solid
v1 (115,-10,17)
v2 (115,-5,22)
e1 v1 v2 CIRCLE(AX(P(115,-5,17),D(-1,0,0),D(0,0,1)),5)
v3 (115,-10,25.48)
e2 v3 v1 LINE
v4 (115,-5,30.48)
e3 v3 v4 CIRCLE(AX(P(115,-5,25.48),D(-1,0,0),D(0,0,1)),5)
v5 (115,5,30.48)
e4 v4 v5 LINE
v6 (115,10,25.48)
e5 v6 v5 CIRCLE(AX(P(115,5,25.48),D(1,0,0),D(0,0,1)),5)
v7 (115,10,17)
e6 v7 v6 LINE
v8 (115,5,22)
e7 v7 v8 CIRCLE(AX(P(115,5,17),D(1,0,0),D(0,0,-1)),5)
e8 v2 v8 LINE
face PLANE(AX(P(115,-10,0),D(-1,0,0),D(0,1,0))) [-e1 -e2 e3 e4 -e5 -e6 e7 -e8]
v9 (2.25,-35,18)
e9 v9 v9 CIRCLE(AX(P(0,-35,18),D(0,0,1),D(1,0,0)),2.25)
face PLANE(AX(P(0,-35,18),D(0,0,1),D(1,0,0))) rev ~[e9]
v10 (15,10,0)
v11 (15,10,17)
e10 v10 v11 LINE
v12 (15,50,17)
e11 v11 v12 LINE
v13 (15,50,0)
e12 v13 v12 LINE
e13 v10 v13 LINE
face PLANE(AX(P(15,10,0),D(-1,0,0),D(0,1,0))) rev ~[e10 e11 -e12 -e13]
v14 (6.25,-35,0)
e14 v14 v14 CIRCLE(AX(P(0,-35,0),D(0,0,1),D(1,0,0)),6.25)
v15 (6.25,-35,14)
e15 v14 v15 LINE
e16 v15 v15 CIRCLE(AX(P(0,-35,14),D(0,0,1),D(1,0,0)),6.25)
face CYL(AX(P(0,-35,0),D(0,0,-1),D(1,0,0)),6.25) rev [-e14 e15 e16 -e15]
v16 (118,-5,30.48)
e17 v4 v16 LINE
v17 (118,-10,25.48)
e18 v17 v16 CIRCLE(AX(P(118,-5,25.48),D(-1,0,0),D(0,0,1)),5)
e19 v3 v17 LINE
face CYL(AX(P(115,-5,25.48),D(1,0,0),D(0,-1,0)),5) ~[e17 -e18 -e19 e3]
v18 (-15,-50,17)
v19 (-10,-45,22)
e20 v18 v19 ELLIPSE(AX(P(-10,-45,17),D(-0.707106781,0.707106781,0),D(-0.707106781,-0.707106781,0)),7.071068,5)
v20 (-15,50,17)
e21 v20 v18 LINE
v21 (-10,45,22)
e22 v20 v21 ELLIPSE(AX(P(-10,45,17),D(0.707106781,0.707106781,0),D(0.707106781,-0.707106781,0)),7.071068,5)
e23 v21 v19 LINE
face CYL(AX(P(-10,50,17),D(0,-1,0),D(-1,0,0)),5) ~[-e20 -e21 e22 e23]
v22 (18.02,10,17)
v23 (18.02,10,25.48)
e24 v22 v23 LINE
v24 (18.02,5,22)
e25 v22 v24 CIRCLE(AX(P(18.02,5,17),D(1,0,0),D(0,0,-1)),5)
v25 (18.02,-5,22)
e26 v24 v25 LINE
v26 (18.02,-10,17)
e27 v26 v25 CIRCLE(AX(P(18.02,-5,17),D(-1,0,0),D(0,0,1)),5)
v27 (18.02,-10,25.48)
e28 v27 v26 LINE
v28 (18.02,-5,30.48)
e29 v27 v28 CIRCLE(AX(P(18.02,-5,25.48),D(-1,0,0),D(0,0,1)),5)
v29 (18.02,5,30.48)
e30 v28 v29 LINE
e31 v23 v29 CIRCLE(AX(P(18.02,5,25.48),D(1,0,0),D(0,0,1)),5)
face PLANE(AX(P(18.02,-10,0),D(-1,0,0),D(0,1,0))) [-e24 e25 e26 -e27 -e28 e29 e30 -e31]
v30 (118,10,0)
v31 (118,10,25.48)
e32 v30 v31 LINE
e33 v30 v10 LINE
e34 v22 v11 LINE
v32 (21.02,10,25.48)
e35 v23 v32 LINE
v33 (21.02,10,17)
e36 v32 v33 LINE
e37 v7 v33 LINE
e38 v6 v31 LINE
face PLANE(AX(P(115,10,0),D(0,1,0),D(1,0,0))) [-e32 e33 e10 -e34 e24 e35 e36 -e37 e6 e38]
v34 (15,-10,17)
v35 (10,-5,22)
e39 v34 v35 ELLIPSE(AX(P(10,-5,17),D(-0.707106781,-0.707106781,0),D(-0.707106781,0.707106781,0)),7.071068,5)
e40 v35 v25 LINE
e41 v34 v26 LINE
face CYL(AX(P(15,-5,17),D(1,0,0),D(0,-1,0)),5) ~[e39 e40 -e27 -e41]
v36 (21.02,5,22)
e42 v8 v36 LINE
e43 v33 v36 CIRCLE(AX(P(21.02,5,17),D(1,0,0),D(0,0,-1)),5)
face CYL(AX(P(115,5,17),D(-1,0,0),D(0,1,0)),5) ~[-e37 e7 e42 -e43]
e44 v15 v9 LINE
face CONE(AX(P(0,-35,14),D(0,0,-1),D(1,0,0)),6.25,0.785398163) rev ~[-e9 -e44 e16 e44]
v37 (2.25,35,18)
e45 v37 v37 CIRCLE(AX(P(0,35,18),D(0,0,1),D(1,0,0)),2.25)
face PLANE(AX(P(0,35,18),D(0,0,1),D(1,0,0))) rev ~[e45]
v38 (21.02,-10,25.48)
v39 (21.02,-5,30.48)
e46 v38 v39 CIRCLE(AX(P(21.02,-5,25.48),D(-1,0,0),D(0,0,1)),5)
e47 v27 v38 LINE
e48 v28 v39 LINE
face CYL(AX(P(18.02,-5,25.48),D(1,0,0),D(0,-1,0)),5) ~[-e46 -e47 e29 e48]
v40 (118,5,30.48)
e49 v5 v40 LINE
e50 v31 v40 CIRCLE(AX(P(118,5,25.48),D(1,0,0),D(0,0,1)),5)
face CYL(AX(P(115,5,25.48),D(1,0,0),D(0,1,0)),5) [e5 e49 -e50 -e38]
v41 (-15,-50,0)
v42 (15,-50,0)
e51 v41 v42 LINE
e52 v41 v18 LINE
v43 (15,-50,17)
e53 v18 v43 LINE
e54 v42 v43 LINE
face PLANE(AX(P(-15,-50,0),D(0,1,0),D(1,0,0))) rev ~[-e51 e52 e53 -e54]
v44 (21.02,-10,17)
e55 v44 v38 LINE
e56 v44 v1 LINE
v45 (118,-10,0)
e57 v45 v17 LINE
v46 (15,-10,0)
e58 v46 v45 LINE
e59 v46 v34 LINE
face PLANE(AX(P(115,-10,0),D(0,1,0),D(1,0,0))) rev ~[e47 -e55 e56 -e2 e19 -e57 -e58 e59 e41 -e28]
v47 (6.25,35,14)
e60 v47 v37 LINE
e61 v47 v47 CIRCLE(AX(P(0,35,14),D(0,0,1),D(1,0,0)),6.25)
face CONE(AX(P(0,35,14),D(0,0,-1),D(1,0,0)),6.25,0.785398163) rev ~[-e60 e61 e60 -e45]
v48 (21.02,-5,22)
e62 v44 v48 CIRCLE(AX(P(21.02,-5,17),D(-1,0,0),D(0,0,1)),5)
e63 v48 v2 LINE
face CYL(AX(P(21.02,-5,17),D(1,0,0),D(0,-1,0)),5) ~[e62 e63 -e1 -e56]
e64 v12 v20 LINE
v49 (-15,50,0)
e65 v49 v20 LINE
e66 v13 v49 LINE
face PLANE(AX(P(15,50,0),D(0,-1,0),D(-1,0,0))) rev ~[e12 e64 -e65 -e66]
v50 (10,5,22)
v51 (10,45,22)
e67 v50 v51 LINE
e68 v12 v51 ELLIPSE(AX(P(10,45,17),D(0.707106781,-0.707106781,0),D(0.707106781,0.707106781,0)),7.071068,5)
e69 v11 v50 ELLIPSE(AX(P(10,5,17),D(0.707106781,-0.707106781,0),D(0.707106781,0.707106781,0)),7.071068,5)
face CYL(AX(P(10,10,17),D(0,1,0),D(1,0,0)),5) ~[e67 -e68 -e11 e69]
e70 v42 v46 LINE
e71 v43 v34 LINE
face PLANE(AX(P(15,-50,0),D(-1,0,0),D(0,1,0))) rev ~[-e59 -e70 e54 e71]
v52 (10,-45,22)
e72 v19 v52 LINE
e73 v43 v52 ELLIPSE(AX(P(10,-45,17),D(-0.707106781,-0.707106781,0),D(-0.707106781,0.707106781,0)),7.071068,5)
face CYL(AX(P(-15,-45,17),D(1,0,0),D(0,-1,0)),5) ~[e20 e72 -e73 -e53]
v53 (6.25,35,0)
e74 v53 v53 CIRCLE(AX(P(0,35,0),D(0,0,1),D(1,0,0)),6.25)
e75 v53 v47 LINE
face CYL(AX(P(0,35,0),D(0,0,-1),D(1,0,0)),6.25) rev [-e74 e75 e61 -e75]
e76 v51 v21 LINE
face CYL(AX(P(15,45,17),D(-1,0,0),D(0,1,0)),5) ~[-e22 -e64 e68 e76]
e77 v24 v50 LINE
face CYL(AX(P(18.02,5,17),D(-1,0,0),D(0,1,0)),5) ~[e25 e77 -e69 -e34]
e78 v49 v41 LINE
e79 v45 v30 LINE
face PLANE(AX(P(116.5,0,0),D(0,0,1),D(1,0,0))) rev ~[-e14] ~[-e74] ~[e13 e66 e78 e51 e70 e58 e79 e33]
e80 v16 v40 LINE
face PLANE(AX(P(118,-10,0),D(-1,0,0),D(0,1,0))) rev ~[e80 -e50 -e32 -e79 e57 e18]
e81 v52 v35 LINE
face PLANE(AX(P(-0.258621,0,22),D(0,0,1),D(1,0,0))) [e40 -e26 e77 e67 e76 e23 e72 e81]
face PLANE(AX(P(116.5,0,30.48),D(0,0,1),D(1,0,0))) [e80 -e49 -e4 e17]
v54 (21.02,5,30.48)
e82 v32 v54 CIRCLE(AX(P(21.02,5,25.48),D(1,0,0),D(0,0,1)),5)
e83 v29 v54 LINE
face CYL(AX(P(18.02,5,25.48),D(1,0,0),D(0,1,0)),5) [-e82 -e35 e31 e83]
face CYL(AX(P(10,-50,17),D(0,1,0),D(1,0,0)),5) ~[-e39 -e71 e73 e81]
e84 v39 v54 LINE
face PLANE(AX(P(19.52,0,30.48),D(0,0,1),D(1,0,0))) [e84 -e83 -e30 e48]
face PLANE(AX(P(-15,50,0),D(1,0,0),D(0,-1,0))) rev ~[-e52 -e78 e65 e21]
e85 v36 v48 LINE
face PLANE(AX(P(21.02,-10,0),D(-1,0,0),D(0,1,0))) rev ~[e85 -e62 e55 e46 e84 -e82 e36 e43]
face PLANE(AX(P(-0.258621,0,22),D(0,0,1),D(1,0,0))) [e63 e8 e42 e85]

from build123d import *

# Parameters (mm, degrees)
F0_R     = 6.25
F0_W     = 15
F0_H     = 20
F0_W_2   = 93.98
F0_W_3   = 3.02
F0_W_4   = 3
F1_DEPTH = 22
F2_DEPTH = 30.48
F3_DEPTH = 18
F4_SIZE  = 4
F5_R     = 5


with BuildPart() as f1:
    # F0 (on Top) → F1 (new body)
    with BuildSketch(Plane.XY):
        Polygon((15, 10), (15, 50), (-15, 50), (-15, -50), (15, -50), (15, -10), (0, -10), (0, 10), align=None)
        with Locations((0, -35)):
            Circle(F0_R, mode=Mode.SUBTRACT)
        with Locations((0, 35)):
            Circle(F0_R, mode=Mode.SUBTRACT)
        with Locations((7.5, 0)):
            Rectangle(F0_W, F0_H)
        with Locations((68.01, 0)):
            Rectangle(F0_W_2, F0_H)
        with Locations((0, -35)):
            Circle(F0_R)
        with Locations((0, 35)):
            Circle(F0_R)
        with Locations((16.51, 0)):
            Rectangle(F0_W_3, F0_H)
        with Locations((19.52, 0)):
            Rectangle(F0_W_4, F0_H)
    extrude(amount=F1_DEPTH)

    # F0 (on Top) → F2 (join)
    with BuildSketch(Plane.XY):
        with Locations((116.5, 0)):
            Rectangle(F0_W_4, F0_H)
        with Locations((19.52, 0)):
            Rectangle(F0_W_4, F0_H)
    extrude(amount=F2_DEPTH)

    # F0 (on Top) → F3 (cut)
    with BuildSketch(Plane.XY):
        with Locations((0, -35)):
            Circle(F0_R)
        with Locations((0, 35)):
            Circle(F0_R)
    extrude(amount=F3_DEPTH, mode=Mode.SUBTRACT)

    # F4
    f4_edges = [f1.edges().sort_by_distance(p)[0] for p in [
        (-6.25, -35, 18),
        (-6.25, 35, 18),
    ]]
    chamfer(f4_edges, length=F4_SIZE)

    # F5
    f5_edges = [f1.edges().sort_by_distance(p)[0] for p in [
        (68.01, -10, 22),
        (68.01, 10, 22),
        (116.5, -10, 30.48),
        (116.5, 10, 30.48),
        (15, -30, 22),
        (15, 30, 22),
        (-15, 0, 22),
        (0, -50, 22),
        (0, 50, 22),
        (19.52, -10, 30.48),
        (19.52, 10, 30.48),
        (16.51, 10, 22),
        (16.51, -10, 22),
    ]]
    fillet(f5_edges, radius=F5_R)


solid = f1.part
